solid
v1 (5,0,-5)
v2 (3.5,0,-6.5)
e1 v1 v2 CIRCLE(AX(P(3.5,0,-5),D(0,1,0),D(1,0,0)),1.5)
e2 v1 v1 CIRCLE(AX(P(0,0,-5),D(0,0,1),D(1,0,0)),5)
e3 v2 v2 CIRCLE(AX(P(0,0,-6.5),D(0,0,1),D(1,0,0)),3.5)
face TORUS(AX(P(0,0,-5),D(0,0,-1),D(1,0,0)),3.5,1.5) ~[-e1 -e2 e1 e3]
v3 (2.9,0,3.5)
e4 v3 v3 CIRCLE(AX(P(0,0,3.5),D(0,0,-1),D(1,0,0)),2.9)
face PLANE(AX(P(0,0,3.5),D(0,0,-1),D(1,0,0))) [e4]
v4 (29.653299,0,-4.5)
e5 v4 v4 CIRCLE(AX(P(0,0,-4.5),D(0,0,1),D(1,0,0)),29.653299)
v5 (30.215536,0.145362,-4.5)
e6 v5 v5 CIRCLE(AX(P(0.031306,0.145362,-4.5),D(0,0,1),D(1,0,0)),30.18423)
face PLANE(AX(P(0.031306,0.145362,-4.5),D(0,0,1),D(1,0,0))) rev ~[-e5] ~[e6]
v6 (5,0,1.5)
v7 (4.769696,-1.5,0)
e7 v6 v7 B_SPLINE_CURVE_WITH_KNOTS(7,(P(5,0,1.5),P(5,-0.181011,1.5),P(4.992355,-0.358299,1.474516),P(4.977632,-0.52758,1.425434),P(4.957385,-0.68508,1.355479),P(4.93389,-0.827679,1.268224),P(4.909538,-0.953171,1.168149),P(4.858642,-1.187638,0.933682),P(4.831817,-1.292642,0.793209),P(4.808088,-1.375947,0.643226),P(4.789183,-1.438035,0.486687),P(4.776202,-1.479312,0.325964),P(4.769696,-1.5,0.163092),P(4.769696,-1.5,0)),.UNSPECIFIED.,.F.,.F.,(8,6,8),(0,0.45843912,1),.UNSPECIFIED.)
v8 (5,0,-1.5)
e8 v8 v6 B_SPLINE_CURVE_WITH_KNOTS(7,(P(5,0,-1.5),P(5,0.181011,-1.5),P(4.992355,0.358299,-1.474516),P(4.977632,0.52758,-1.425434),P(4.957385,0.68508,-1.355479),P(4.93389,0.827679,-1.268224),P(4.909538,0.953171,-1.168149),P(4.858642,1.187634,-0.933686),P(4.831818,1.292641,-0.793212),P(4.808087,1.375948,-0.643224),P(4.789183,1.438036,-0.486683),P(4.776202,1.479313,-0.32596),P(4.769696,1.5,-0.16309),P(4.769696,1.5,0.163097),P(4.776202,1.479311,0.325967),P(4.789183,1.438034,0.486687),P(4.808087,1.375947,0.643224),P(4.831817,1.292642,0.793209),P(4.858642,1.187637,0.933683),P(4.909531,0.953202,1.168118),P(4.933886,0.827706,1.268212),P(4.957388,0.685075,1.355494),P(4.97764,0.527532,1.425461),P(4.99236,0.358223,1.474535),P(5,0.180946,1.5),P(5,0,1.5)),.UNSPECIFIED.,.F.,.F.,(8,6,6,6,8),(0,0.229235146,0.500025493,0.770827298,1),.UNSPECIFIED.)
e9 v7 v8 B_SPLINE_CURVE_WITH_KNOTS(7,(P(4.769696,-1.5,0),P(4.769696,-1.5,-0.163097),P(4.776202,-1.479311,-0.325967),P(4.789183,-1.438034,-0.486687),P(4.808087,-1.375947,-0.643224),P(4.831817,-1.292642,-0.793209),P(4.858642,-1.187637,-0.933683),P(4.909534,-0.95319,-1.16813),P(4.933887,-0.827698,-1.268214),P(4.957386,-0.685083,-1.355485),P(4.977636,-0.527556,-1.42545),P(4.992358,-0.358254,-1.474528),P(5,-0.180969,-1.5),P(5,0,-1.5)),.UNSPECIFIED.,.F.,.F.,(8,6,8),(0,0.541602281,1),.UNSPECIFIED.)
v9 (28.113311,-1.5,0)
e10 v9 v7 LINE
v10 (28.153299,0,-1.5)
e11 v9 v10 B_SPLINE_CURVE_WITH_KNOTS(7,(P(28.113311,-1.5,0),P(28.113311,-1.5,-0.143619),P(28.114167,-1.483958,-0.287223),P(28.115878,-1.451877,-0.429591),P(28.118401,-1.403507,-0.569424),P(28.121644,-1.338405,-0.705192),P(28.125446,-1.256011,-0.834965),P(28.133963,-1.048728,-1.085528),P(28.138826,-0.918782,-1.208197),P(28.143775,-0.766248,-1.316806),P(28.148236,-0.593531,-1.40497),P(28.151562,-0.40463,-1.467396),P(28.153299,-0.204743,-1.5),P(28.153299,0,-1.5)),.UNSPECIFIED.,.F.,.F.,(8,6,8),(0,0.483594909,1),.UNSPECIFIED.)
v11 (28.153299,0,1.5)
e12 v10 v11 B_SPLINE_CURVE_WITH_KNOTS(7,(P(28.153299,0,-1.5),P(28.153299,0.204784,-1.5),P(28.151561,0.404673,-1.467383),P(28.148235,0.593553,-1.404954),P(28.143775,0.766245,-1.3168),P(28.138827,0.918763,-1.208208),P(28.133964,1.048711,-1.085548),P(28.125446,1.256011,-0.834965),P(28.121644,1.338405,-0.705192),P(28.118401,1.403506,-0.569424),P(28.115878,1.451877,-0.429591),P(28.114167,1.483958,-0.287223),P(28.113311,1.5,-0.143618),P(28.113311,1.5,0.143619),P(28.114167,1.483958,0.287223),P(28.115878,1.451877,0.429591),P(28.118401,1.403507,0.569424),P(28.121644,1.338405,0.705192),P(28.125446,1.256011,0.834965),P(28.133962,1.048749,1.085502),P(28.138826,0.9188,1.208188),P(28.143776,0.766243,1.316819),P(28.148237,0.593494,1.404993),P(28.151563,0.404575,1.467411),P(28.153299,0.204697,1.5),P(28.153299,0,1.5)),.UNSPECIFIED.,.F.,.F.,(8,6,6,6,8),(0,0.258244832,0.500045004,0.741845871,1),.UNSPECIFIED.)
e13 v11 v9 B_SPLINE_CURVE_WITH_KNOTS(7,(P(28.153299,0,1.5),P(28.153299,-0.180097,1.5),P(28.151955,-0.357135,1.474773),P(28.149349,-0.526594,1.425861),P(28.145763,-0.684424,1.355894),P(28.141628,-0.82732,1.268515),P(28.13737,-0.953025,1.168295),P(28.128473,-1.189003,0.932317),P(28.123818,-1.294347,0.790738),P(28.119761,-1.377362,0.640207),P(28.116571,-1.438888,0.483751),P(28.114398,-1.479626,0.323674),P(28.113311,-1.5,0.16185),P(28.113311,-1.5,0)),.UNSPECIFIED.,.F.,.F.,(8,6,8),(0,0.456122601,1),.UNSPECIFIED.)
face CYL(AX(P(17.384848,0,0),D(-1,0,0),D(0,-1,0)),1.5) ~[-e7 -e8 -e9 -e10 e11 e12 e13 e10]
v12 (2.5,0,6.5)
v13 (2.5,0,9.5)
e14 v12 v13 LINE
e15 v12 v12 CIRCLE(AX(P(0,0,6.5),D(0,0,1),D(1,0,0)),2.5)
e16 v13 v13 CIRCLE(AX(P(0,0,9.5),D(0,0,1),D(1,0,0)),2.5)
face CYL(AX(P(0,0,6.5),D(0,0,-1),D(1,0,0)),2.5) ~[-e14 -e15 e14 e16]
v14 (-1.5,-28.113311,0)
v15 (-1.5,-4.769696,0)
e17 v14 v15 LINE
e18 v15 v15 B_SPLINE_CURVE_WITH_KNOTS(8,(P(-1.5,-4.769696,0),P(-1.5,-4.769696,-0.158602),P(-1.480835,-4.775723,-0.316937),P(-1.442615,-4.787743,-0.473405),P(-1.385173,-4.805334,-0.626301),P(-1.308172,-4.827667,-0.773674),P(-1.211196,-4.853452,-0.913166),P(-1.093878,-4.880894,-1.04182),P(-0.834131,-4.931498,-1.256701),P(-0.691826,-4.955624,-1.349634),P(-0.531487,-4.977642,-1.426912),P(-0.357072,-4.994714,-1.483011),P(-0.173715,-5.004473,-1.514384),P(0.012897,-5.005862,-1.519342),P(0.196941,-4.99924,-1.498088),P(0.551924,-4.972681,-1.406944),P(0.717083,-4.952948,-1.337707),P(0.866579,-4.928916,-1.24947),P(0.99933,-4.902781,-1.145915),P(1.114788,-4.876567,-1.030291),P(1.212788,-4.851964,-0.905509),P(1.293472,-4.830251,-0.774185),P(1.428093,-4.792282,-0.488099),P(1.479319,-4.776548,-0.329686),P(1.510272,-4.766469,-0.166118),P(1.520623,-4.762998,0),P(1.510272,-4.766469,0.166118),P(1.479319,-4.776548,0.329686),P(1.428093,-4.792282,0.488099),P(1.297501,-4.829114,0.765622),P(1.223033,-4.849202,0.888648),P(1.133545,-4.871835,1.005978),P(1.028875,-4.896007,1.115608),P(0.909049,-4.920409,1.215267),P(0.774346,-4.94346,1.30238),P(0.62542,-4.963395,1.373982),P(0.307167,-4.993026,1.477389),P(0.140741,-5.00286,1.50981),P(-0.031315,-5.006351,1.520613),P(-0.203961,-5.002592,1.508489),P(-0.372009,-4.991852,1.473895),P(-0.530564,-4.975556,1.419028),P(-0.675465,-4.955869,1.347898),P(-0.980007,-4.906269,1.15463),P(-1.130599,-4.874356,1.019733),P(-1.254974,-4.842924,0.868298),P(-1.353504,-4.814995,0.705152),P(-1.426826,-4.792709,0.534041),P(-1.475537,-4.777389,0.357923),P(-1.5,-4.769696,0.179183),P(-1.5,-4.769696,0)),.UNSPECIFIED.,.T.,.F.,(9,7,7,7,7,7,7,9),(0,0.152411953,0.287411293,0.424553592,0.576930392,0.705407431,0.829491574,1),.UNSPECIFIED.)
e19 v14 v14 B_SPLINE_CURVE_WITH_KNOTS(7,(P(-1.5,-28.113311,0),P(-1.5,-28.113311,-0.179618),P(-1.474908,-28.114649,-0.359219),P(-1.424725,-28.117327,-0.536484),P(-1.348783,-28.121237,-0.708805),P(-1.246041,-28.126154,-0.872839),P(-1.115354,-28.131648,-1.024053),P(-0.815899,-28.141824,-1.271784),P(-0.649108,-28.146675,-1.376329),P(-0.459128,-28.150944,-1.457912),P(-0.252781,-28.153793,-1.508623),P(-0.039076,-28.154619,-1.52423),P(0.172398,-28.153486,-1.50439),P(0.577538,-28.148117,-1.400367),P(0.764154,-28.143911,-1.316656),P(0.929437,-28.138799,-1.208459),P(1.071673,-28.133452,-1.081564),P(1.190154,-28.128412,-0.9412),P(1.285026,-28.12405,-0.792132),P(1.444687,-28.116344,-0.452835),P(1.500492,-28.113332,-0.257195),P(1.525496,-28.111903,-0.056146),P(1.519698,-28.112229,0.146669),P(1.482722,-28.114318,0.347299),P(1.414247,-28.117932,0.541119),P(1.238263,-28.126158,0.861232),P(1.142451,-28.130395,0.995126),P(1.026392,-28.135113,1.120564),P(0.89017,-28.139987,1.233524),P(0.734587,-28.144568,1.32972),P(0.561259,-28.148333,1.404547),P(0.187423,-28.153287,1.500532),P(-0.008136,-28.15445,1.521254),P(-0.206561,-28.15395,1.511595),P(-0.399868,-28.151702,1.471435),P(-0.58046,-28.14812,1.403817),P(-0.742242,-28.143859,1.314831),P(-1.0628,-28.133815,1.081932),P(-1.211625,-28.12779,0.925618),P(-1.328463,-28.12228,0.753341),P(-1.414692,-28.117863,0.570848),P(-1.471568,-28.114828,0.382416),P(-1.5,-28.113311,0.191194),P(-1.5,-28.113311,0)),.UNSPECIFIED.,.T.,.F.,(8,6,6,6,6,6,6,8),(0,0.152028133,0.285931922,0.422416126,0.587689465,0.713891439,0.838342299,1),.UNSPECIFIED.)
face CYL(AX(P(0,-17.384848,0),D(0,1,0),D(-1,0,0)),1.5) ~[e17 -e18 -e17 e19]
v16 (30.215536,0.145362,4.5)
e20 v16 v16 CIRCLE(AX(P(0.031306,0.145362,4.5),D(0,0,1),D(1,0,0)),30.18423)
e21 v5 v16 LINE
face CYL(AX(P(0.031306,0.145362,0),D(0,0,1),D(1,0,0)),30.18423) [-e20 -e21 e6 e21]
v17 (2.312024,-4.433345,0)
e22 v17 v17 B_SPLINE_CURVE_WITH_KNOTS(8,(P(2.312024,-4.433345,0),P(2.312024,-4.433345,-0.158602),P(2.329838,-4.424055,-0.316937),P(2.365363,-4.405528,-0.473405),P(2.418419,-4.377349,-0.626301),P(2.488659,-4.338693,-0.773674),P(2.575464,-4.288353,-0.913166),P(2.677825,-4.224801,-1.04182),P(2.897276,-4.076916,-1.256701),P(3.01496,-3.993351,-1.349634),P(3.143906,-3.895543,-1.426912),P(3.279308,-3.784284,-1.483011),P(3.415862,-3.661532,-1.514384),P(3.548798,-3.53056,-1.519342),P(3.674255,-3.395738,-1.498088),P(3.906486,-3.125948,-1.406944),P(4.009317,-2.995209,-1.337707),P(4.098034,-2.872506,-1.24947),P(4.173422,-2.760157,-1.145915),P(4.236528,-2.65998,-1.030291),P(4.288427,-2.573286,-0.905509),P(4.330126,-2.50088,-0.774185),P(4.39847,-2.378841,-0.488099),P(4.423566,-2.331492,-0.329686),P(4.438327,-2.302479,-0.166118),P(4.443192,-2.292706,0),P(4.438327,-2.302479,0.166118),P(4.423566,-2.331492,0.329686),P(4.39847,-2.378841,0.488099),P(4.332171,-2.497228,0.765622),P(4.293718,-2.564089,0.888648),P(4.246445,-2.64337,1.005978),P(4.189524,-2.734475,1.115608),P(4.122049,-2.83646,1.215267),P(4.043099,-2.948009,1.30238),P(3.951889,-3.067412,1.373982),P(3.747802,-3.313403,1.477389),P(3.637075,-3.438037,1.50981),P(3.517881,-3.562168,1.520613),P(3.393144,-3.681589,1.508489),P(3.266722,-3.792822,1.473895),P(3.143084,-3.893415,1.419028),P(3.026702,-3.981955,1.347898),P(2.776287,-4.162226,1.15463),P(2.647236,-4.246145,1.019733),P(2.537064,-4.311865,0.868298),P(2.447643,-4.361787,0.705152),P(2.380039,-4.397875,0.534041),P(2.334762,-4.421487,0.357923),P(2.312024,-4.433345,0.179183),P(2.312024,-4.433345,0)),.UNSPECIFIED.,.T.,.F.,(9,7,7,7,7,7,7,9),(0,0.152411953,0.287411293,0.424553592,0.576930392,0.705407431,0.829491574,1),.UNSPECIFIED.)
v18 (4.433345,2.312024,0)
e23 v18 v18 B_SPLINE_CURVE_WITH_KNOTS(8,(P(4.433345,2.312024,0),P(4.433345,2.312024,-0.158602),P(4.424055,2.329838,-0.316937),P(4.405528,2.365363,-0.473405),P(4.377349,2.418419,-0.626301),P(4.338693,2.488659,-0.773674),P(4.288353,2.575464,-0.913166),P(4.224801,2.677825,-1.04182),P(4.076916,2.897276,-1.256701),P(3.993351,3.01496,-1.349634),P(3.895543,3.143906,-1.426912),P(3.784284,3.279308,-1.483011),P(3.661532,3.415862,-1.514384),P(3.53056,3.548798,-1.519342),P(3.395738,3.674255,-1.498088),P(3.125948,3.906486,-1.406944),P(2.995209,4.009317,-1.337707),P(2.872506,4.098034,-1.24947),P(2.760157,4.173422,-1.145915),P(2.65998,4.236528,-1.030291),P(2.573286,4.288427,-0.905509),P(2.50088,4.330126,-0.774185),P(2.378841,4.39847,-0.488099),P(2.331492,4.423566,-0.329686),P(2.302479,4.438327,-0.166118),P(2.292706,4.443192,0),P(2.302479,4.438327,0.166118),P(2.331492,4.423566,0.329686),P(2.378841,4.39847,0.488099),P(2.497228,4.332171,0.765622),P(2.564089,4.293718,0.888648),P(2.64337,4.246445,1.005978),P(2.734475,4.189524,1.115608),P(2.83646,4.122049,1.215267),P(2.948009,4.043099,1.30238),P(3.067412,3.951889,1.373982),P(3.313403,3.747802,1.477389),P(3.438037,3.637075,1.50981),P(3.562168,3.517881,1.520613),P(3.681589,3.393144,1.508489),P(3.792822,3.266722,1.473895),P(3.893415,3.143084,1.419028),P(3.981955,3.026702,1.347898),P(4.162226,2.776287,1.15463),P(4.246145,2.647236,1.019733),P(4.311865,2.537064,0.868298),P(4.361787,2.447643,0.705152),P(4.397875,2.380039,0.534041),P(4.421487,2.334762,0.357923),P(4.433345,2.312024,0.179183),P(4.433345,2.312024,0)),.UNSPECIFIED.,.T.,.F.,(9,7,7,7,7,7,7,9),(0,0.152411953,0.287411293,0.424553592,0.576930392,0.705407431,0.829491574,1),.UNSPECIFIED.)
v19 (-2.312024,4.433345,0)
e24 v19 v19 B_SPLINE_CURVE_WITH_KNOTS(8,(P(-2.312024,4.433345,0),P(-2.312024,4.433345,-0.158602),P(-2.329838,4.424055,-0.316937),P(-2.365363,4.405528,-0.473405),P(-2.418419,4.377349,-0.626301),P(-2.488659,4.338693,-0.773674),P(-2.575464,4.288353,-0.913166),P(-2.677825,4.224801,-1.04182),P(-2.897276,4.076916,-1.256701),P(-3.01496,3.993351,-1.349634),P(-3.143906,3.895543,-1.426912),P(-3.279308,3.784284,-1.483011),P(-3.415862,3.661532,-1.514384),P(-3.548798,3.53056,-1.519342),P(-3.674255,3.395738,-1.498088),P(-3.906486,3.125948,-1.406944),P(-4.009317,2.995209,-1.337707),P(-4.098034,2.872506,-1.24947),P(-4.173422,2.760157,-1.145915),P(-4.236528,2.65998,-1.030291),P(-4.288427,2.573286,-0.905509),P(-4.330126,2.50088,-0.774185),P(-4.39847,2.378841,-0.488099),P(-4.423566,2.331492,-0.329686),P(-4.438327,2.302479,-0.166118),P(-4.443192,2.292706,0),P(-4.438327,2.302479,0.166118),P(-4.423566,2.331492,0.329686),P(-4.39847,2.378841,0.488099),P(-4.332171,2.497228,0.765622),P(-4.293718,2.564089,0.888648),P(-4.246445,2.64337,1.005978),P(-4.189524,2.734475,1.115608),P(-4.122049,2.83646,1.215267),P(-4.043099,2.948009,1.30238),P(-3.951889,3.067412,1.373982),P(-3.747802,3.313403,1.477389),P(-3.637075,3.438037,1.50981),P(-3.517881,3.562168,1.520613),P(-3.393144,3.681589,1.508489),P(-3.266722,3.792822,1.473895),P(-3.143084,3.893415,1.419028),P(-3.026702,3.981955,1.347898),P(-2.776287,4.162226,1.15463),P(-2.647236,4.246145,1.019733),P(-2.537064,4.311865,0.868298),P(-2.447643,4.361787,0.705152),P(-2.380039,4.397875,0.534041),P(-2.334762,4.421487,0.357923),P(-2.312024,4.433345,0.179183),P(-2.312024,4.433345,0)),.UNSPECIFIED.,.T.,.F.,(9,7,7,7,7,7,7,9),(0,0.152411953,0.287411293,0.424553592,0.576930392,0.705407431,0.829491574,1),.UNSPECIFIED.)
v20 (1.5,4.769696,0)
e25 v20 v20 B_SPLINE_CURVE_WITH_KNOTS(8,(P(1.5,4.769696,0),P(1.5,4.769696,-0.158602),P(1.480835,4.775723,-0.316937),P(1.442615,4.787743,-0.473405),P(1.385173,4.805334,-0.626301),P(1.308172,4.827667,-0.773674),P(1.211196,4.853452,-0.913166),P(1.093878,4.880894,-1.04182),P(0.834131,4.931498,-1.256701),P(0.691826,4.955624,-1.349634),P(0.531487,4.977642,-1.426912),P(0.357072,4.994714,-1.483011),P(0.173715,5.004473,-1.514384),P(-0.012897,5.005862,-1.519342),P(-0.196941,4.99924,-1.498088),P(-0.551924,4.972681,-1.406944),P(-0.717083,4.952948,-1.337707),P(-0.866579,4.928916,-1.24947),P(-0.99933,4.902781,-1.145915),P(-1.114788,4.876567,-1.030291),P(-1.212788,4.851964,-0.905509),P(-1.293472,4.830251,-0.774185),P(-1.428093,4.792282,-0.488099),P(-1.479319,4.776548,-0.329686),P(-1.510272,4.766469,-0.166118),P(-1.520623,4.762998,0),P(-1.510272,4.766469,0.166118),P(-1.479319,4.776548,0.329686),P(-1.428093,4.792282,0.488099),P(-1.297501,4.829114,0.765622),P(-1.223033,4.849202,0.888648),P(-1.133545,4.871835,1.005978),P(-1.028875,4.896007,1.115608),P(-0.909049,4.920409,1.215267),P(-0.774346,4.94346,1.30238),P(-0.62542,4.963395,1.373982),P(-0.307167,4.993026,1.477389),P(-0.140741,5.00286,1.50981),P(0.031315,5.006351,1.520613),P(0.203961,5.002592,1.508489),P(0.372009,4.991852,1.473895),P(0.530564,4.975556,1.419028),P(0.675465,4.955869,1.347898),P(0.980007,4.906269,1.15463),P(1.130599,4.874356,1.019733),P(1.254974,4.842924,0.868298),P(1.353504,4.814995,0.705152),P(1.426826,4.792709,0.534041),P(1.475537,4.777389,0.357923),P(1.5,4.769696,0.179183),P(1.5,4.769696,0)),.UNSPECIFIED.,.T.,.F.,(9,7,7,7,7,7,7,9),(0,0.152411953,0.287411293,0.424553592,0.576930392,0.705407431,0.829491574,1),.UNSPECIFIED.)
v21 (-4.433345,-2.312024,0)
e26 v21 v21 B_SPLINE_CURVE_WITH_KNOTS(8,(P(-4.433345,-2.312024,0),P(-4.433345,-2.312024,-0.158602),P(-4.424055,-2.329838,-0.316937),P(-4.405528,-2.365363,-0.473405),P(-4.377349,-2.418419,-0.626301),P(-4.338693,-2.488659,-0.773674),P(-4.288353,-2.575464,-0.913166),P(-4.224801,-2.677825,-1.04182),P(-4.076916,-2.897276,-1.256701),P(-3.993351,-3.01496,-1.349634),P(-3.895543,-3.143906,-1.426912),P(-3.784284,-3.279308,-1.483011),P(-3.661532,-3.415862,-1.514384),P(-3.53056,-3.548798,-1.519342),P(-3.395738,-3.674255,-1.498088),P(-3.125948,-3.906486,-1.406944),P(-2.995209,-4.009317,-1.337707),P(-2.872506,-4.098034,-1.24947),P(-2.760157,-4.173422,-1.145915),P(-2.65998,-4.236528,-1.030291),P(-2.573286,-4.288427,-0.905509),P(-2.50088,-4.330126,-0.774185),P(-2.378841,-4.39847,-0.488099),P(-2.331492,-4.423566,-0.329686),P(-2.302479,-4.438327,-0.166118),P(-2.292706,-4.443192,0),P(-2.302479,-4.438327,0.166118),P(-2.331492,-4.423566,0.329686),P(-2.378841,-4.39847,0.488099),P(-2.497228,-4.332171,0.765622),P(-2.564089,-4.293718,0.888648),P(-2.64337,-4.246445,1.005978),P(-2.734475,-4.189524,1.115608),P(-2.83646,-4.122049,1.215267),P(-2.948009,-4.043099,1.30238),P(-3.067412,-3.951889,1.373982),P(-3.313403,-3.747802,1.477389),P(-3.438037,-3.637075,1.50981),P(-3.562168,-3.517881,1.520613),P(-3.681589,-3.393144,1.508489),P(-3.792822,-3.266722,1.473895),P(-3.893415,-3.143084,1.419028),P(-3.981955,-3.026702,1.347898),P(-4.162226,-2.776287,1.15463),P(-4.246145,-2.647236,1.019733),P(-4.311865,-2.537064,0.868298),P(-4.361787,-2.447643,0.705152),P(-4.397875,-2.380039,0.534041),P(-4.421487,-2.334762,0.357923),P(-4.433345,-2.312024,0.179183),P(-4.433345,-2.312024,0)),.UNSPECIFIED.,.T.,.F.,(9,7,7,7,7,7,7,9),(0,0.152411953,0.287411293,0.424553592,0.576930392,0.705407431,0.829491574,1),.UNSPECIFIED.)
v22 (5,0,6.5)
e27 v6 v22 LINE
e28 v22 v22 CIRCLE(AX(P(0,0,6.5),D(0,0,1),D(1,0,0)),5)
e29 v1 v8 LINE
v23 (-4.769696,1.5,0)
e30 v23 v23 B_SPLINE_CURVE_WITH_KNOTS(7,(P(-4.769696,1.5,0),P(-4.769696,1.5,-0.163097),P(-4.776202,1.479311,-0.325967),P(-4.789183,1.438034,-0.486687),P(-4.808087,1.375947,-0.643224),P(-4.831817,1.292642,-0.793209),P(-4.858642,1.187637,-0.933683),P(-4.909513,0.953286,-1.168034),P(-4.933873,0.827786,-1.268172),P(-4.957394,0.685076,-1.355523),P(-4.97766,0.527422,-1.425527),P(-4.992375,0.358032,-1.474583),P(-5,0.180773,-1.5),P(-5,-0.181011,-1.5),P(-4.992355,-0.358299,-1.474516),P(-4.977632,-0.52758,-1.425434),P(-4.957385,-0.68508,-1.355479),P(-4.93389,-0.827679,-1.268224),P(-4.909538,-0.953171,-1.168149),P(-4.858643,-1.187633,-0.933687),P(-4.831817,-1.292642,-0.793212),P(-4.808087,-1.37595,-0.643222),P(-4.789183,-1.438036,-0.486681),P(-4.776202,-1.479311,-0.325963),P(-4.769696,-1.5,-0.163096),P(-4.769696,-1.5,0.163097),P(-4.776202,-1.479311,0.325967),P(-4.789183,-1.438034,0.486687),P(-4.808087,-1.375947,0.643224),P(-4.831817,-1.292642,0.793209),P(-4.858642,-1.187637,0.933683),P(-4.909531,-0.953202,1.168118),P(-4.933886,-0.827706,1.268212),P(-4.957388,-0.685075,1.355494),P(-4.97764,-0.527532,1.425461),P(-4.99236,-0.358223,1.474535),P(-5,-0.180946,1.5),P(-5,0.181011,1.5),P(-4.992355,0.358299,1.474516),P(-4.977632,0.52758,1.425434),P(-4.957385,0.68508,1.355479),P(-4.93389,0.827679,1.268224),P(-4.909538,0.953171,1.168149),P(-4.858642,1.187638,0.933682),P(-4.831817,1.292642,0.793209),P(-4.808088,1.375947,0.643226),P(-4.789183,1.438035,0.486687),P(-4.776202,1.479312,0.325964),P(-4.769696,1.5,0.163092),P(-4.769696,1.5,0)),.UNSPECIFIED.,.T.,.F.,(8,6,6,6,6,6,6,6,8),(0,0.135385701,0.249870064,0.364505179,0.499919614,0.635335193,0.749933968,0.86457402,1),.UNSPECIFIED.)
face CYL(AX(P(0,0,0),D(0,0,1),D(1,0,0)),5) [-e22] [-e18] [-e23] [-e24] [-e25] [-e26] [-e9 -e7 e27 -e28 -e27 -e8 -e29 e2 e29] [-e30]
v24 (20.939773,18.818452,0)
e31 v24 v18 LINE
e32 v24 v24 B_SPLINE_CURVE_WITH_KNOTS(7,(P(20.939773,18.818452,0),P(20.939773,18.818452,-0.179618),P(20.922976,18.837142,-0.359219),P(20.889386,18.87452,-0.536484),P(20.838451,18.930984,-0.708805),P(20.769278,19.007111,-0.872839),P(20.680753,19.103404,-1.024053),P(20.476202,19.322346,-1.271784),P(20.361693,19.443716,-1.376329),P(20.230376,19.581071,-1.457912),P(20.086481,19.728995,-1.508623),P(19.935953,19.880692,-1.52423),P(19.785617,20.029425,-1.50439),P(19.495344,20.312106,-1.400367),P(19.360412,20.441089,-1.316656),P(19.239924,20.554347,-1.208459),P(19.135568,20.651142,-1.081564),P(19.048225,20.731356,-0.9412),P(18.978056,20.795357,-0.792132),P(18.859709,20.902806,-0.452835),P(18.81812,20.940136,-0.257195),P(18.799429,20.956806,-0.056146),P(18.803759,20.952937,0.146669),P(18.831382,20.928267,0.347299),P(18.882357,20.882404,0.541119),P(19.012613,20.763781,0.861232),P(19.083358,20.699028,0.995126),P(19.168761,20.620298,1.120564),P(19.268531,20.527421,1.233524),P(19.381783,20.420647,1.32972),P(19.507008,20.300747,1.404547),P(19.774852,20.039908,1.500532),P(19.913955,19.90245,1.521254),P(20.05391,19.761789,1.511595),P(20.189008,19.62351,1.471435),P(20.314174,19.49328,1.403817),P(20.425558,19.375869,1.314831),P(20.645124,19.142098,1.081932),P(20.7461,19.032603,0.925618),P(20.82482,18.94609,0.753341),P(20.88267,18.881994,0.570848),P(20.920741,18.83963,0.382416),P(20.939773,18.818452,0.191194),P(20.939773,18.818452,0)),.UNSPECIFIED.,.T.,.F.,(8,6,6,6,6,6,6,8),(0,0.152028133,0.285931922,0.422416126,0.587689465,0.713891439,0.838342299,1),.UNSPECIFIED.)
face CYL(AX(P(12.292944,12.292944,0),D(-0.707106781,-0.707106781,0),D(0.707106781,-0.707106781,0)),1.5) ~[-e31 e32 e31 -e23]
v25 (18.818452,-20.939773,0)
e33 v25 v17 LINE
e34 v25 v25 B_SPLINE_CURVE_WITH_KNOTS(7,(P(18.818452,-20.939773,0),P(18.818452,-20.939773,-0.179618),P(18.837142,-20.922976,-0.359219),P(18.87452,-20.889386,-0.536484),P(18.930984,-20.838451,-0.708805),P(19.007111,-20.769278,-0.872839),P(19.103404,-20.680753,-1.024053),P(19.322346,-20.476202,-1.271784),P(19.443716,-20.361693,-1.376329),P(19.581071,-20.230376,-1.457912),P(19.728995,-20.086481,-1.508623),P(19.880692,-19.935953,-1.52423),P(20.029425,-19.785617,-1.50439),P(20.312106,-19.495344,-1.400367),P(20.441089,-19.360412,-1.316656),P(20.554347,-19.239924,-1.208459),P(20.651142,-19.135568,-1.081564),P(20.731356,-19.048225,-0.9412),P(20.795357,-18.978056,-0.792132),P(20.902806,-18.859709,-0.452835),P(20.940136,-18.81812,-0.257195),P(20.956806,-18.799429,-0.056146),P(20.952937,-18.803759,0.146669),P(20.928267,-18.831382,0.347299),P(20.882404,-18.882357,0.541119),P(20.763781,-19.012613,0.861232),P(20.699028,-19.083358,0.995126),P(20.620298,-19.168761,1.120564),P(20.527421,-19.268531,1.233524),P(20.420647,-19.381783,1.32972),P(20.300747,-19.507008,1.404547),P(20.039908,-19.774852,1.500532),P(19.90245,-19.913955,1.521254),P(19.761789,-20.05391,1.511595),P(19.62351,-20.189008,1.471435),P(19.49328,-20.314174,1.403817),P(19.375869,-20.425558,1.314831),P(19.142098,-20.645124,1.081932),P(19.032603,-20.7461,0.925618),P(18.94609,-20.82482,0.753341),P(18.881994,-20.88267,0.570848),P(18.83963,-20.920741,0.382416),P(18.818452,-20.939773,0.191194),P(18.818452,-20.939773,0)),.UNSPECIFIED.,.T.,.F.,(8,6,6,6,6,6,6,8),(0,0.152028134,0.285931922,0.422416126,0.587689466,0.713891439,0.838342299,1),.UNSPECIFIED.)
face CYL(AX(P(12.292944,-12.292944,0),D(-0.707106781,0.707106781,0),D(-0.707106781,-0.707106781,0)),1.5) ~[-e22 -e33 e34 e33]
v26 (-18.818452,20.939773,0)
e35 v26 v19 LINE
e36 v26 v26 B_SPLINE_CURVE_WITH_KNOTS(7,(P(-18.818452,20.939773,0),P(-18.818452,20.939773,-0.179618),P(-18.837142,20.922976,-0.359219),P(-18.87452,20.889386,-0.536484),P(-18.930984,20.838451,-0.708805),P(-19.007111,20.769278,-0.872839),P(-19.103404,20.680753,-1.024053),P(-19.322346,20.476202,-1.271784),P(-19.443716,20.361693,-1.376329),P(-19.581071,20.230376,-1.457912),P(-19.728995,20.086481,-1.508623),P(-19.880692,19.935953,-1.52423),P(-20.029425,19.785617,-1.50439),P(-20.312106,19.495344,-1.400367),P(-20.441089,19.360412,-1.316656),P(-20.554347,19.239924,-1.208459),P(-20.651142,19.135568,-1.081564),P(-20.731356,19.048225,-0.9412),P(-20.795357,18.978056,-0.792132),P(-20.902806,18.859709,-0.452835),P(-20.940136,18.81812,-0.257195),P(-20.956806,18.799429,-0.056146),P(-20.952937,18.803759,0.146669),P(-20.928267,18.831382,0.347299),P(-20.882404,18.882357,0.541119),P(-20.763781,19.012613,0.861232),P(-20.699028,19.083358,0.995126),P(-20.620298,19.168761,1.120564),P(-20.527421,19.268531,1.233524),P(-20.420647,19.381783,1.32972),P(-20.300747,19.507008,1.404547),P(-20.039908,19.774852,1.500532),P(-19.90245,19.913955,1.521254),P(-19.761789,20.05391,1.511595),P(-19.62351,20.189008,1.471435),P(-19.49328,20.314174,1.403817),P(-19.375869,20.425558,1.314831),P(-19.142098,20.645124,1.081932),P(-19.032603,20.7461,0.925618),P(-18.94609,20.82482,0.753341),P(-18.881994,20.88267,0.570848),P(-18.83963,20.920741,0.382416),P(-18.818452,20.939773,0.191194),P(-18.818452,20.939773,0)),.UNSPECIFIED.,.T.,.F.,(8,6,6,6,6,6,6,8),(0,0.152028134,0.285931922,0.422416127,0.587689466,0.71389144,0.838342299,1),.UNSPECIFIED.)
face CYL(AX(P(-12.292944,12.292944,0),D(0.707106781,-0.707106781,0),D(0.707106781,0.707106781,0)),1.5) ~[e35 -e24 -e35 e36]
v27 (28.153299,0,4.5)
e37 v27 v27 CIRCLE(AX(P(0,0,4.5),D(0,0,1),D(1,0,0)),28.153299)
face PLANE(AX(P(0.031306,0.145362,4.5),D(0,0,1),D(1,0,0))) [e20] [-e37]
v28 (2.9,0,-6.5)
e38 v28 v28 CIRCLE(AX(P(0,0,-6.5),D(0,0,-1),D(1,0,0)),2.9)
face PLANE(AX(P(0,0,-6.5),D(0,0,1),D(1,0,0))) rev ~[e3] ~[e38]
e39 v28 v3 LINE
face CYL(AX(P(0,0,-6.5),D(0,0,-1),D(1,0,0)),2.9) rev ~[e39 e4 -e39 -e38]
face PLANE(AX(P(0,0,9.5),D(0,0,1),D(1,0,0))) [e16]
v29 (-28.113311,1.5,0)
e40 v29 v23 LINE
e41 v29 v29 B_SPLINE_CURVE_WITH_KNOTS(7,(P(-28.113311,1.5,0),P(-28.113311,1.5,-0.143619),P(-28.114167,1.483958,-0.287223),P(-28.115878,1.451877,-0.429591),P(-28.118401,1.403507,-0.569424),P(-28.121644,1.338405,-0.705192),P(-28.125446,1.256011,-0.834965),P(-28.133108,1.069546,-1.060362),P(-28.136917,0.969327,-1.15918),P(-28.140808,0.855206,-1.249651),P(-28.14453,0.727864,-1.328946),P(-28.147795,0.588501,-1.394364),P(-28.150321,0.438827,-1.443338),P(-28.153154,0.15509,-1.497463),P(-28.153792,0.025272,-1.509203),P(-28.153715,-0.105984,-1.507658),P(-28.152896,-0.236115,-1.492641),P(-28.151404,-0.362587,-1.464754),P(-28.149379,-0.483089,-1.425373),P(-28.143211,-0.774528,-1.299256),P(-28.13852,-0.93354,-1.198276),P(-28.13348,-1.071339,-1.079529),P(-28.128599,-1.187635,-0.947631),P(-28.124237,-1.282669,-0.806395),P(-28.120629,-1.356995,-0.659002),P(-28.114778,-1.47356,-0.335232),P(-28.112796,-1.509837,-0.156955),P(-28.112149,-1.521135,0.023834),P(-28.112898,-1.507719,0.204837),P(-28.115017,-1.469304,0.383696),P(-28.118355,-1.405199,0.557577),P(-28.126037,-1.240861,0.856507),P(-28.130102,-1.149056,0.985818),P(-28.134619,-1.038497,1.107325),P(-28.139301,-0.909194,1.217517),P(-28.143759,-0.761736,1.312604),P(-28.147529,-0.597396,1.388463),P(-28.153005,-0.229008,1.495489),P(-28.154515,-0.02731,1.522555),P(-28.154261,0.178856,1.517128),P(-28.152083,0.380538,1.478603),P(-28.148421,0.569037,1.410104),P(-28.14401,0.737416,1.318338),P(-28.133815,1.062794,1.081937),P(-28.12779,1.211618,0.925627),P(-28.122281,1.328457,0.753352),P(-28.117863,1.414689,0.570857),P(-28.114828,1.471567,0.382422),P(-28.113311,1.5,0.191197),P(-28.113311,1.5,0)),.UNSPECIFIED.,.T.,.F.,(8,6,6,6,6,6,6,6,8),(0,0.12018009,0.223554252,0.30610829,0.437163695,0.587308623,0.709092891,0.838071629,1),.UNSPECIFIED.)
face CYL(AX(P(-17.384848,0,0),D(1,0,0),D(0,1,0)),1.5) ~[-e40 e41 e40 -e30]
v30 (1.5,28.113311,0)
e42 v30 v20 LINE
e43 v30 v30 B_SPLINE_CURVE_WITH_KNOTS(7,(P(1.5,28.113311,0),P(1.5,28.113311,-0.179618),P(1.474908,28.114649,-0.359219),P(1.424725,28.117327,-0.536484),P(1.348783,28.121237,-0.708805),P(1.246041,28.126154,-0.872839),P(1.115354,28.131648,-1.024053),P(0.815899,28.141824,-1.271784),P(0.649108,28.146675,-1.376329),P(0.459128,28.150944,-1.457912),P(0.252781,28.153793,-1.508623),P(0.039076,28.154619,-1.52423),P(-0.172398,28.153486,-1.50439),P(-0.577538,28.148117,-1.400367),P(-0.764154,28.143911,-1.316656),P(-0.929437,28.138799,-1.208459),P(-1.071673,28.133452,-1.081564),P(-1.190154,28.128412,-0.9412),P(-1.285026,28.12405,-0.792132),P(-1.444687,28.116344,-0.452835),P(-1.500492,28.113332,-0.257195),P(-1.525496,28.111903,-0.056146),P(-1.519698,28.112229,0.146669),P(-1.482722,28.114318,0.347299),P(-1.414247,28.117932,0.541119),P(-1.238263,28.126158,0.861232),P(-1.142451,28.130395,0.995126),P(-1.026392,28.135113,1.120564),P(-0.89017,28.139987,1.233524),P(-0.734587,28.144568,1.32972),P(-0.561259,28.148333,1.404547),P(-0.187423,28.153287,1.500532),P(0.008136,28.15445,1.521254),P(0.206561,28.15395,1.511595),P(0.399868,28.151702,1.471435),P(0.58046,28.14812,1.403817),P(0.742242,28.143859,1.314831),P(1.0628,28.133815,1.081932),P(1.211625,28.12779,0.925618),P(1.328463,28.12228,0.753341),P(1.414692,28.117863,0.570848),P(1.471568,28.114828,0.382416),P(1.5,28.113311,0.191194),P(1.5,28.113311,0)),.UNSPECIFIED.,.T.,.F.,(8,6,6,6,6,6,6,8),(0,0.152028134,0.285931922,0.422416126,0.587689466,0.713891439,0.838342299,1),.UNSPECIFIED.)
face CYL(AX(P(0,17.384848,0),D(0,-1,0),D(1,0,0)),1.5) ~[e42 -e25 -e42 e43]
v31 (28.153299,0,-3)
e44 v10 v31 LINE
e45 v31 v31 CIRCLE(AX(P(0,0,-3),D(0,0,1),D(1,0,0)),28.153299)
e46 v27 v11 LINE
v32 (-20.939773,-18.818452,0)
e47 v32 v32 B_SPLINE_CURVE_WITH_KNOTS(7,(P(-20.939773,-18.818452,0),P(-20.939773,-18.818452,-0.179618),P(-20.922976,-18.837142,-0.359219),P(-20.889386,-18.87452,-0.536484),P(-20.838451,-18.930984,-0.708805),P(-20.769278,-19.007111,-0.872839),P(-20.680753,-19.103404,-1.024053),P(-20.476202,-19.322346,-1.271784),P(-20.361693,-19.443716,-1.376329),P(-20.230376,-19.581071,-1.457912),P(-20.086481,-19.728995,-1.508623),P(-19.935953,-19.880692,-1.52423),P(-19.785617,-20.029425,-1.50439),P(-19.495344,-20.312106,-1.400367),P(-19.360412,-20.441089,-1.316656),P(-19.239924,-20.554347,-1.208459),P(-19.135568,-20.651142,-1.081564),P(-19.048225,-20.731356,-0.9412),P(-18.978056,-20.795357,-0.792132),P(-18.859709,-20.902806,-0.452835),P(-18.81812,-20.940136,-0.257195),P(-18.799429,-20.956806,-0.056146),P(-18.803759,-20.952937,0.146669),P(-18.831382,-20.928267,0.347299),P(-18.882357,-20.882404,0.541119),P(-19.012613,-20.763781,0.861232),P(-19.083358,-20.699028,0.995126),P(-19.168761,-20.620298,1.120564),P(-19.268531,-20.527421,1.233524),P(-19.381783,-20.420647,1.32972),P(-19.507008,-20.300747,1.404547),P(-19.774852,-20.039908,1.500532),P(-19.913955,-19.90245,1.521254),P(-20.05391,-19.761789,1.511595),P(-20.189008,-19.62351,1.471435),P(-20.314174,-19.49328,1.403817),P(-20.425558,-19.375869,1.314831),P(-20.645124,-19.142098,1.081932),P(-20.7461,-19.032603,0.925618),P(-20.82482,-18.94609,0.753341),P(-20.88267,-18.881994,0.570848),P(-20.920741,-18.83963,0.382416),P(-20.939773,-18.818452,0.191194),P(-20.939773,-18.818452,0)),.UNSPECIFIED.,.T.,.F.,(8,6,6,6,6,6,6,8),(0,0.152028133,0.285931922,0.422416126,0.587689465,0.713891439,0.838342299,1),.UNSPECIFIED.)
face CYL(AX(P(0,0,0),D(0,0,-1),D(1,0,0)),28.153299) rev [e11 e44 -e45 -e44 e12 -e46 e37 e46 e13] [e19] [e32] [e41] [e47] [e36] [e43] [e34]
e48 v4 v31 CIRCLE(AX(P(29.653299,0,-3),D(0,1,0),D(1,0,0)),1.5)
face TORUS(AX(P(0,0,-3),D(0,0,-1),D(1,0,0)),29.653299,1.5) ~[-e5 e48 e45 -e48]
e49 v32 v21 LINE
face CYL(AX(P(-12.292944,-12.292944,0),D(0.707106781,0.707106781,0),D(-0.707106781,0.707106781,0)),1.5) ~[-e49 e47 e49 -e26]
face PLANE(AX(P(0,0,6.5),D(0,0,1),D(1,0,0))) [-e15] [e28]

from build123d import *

# Parameters (mm, degrees)
F0_R            = 5
F1_DEPTH        = 6.5
F2_R            = 2.9
F3_DEPTH        = 10
F4_W            = 1.5
F4_H            = 25.2303039929
F5_COPIES_COUNT = 8
F6_R            = 30.1842300119
F6_R_2          = 28.1532988992
F7_DEPTH        = 4.5
F8_R            = 1.5
F9_R            = 2.5
F10_DEPTH       = 3


# Not quite as in the source:
# - a pattern or mirror of a feature is missing from the dataset's text; its kind, count and spacing are read off the source's solid


with BuildPart() as f1:
    # F0 (on Top) → F1 (new body, symmetric)
    with BuildSketch(Plane.XY):
        Circle(F0_R)
    extrude(amount=F1_DEPTH, both=True)

    # F2 (on face) → F3 (cut)
    with BuildSketch(Plane(origin=(0, 0, -6.5), x_dir=(1, 0, 0), z_dir=(0, 0, -1))):
        Circle(F2_R)
    extrude(amount=-F3_DEPTH, mode=Mode.SUBTRACT)

    # F4 (on Top) → F5 (revolve)
    with BuildSketch(Plane.XY):
        with Locations((-0.75, -17.3848480035)):
            Rectangle(F4_W, F4_H)
    f5 = revolve(axis=Axis((0, -23.260904476, 0), (0, -1, 0)))

    # F5_copies: F5 ×8 about axis
    f5_copies_axis = Axis((0, 0, 0), (0, 0, 1))
    for i in range(1, F5_COPIES_COUNT):
        add(f5.rotate(f5_copies_axis, i * 360 / F5_COPIES_COUNT))

    # F6 (on Top) → F7 (join, symmetric)
    with BuildSketch(Plane.XY):
        with Locations((0.0313063833, 0.1453618683)):
            Circle(F6_R)
        Circle(F6_R_2, mode=Mode.SUBTRACT)
    extrude(amount=F7_DEPTH, both=True)

    # F8
    f8_edges = [f1.edges().sort_by_distance(p)[0] for p in [
        (-5, 0, -6.5),
        (-28.153299, 0, -4.5),
    ]]
    fillet(f8_edges, radius=F8_R)

    # F9 (on face) → F10 (join)
    with BuildSketch(Plane.XY.offset(6.5)):
        Circle(F9_R)
    extrude(amount=F10_DEPTH)


solid = f1.part
